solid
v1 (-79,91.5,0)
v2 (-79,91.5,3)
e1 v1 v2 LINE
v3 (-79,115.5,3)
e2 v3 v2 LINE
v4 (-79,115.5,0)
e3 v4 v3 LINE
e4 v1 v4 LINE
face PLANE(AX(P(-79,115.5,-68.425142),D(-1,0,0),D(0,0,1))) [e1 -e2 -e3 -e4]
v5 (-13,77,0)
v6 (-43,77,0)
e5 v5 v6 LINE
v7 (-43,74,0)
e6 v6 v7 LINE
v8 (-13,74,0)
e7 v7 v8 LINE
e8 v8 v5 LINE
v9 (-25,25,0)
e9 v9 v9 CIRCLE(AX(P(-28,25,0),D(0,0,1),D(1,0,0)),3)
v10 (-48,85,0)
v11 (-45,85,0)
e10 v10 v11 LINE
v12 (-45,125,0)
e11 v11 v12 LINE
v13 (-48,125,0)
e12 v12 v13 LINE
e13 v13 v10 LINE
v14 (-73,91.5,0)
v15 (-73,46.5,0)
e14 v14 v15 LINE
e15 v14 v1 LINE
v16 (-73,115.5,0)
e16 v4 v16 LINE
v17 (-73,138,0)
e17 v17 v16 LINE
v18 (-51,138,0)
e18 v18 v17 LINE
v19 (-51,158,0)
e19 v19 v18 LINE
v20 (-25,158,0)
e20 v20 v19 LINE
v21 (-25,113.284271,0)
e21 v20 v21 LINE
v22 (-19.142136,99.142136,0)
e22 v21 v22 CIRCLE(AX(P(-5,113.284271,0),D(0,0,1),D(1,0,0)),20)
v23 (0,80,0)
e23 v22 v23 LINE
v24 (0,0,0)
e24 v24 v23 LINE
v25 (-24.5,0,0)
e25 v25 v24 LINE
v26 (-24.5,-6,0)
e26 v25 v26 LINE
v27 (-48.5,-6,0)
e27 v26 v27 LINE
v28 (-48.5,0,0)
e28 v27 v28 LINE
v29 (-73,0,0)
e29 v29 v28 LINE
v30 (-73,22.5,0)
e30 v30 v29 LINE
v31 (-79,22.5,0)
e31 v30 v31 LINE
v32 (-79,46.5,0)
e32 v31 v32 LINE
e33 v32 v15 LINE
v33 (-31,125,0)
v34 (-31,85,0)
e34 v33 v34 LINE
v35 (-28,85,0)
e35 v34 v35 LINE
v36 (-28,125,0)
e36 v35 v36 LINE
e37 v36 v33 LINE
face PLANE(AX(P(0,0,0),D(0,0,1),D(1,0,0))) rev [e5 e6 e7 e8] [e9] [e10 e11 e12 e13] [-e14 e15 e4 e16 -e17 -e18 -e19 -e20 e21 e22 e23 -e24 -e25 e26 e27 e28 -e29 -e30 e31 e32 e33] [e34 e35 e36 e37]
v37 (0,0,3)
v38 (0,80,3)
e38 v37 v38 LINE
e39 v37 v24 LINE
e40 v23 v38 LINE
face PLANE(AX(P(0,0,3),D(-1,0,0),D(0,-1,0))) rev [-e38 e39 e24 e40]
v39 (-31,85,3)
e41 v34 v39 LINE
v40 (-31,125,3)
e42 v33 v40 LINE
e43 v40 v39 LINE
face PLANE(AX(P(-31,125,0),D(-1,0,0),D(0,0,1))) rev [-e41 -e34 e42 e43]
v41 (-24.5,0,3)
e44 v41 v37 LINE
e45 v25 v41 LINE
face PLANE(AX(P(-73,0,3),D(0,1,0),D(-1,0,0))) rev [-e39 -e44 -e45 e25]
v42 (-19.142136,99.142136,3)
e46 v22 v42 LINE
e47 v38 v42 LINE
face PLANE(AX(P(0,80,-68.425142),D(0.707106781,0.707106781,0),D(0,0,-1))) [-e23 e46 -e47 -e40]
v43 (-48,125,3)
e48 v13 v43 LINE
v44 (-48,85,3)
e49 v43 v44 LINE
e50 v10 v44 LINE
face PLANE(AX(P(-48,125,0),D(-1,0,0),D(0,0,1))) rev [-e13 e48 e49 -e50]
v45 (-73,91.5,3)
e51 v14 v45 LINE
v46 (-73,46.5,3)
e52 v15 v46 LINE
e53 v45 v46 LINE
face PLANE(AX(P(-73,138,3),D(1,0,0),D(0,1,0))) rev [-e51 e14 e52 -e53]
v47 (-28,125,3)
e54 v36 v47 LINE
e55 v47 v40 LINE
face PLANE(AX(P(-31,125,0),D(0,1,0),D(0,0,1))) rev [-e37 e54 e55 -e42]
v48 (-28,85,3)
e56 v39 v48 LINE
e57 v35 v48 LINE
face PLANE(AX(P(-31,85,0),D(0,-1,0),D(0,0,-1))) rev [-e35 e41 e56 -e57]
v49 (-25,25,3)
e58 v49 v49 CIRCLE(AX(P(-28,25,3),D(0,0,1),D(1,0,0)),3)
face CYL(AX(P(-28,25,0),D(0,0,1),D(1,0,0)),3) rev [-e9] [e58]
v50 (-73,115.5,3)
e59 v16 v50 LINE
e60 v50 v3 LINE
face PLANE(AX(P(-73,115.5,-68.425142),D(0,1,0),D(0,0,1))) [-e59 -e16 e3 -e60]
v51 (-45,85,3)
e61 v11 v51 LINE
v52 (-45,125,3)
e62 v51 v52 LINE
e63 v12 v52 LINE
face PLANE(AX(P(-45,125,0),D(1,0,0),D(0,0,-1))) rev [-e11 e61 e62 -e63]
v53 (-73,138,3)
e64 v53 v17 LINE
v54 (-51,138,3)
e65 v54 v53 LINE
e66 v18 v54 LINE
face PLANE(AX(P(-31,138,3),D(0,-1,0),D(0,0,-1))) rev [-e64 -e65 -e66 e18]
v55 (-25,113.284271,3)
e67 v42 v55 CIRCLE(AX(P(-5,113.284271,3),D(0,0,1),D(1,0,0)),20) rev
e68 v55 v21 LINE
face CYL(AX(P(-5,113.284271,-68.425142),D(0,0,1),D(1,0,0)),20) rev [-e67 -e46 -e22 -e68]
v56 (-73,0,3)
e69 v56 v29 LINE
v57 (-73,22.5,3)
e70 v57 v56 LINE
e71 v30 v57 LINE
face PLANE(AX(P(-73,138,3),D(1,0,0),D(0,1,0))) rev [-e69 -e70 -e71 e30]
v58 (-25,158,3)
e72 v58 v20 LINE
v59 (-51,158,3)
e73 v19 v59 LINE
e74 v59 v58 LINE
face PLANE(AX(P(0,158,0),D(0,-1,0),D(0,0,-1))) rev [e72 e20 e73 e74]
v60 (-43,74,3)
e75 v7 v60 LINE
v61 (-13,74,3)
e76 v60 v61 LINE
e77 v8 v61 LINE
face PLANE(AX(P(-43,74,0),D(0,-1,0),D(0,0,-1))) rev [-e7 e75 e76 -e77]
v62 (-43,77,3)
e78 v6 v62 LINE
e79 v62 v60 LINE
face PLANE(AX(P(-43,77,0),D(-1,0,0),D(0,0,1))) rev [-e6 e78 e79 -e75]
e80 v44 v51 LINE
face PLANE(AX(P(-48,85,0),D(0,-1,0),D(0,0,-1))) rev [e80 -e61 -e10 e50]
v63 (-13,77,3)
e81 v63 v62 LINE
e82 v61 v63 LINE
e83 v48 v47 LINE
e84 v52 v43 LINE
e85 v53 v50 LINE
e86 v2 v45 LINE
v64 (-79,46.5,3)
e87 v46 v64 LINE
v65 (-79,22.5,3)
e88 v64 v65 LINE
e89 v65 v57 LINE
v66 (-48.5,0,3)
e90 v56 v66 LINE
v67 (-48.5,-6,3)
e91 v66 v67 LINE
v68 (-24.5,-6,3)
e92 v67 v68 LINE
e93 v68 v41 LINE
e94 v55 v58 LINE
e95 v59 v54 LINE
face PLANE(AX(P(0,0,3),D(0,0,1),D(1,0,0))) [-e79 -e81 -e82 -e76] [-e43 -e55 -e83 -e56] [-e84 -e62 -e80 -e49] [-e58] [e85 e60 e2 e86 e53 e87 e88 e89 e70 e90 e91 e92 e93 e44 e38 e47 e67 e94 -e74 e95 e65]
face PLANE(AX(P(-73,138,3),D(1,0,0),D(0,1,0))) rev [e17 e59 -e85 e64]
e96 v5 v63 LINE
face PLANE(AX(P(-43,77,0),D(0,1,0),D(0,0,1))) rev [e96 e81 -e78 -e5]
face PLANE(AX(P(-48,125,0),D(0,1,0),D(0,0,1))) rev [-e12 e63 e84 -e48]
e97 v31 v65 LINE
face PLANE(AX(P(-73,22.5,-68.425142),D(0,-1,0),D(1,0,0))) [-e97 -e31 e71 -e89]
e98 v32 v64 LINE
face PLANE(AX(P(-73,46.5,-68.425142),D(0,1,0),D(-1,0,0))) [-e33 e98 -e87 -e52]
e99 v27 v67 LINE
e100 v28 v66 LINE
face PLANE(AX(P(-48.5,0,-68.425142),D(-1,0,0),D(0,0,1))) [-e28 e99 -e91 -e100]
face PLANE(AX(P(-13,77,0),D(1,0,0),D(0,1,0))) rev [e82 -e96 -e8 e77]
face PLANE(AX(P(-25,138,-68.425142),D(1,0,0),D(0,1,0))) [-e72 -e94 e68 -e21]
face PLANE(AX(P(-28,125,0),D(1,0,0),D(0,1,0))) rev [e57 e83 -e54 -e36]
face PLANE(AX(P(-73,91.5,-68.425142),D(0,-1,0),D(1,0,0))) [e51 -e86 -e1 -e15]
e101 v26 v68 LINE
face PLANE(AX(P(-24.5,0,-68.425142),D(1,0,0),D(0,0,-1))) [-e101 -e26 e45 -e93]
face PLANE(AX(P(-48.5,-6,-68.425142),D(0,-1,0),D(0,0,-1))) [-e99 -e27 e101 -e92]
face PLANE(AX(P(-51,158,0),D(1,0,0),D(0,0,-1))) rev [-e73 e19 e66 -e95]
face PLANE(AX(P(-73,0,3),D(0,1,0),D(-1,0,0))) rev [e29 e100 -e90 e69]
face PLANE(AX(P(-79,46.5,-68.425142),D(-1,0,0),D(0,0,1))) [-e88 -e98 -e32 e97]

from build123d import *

# Parameters (mm, degrees)
BASESHAPE_DEPTH   = 3
SKETCH2_R         = 3
SHAFTHOLES_DEPTH  = 157.147366292
SKETCH4_W         = 6
SKETCH4_H         = 24
SKETCH4_W_2       = 24
SKETCH4_H_2       = 6
FINGERS_DEPTH     = 3
SKETCH5_W         = 30
SKETCH5_H         = 3
SKETCH5_W_2       = 3
SKETCH5_H_2       = 40
GROOVES_DEPTH     = 160.040875249
CHAMFER1_SIZE     = 25
FILLET2_R         = 20
SKETCH6_W         = 26
SKETCH6_H         = 3
MARBLECHUTE_DEPTH = 20


with BuildPart() as part:
    # Sketch1 → BaseShape (new body)
    with BuildSketch(Plane.XY):
        Polygon((-73, 138), (-73, 0), (0, 0), (0, 77), (-31, 77), (-31, 138), align=None)
    extrude(amount=BASESHAPE_DEPTH)

    # Sketch2 → ShaftHoles (cut, through all)
    with BuildSketch(Plane.XY.offset(3)):
        with Locations((-28, 25)):
            Circle(SKETCH2_R)
    extrude(amount=-SHAFTHOLES_DEPTH, mode=Mode.SUBTRACT)

    # Sketch4 → Fingers (add)
    with BuildSketch(Plane.XY.offset(3)):
        Polygon((0, 77), (-31, 77), (-31, 80), (-31, 138), (-25, 138), (-25, 80), (0, 80), align=None)
        with Locations((-76, 103.5)):
            Rectangle(SKETCH4_W, SKETCH4_H)
        with Locations((-76, 34.5)):
            Rectangle(SKETCH4_W, SKETCH4_H)
        with Locations((-36.5, -3)):
            Rectangle(SKETCH4_W_2, SKETCH4_H_2)
    extrude(amount=-FINGERS_DEPTH)

    # Sketch5 → Grooves (cut, through all)
    with BuildSketch(Plane.XY.offset(3)):
        with Locations((-28, 75.5)):
            Rectangle(SKETCH5_W, SKETCH5_H)
        with Locations((-46.5, 105)):
            Rectangle(SKETCH5_W_2, SKETCH5_H_2)
        with Locations((-29.5, 105)):
            Rectangle(SKETCH5_W_2, SKETCH5_H_2)
    extrude(amount=-GROOVES_DEPTH, mode=Mode.SUBTRACT)

    # Chamfer1
    chamfer1_edges = [part.edges().sort_by_distance(p)[0] for p in [
        (-25, 80, 1.5),
    ]]
    chamfer(chamfer1_edges, length=CHAMFER1_SIZE - 0.0001)  # a hair under: the kernel refuses the full size

    # Fillet2
    fillet2_edges = [part.edges().sort_by_distance(p)[0] for p in [
        (-25, 104.9999, 1.5),
    ]]
    fillet(fillet2_edges, radius=FILLET2_R)

    # Sketch6 → MarbleChute (add)
    with BuildSketch(Plane(origin=(0, 138, 0), x_dir=(1, 0, 0), z_dir=(0, 1, 0))):
        with Locations((-38, -1.5)):
            Rectangle(SKETCH6_W, SKETCH6_H)
    extrude(amount=MARBLECHUTE_DEPTH)


solid = part.part
